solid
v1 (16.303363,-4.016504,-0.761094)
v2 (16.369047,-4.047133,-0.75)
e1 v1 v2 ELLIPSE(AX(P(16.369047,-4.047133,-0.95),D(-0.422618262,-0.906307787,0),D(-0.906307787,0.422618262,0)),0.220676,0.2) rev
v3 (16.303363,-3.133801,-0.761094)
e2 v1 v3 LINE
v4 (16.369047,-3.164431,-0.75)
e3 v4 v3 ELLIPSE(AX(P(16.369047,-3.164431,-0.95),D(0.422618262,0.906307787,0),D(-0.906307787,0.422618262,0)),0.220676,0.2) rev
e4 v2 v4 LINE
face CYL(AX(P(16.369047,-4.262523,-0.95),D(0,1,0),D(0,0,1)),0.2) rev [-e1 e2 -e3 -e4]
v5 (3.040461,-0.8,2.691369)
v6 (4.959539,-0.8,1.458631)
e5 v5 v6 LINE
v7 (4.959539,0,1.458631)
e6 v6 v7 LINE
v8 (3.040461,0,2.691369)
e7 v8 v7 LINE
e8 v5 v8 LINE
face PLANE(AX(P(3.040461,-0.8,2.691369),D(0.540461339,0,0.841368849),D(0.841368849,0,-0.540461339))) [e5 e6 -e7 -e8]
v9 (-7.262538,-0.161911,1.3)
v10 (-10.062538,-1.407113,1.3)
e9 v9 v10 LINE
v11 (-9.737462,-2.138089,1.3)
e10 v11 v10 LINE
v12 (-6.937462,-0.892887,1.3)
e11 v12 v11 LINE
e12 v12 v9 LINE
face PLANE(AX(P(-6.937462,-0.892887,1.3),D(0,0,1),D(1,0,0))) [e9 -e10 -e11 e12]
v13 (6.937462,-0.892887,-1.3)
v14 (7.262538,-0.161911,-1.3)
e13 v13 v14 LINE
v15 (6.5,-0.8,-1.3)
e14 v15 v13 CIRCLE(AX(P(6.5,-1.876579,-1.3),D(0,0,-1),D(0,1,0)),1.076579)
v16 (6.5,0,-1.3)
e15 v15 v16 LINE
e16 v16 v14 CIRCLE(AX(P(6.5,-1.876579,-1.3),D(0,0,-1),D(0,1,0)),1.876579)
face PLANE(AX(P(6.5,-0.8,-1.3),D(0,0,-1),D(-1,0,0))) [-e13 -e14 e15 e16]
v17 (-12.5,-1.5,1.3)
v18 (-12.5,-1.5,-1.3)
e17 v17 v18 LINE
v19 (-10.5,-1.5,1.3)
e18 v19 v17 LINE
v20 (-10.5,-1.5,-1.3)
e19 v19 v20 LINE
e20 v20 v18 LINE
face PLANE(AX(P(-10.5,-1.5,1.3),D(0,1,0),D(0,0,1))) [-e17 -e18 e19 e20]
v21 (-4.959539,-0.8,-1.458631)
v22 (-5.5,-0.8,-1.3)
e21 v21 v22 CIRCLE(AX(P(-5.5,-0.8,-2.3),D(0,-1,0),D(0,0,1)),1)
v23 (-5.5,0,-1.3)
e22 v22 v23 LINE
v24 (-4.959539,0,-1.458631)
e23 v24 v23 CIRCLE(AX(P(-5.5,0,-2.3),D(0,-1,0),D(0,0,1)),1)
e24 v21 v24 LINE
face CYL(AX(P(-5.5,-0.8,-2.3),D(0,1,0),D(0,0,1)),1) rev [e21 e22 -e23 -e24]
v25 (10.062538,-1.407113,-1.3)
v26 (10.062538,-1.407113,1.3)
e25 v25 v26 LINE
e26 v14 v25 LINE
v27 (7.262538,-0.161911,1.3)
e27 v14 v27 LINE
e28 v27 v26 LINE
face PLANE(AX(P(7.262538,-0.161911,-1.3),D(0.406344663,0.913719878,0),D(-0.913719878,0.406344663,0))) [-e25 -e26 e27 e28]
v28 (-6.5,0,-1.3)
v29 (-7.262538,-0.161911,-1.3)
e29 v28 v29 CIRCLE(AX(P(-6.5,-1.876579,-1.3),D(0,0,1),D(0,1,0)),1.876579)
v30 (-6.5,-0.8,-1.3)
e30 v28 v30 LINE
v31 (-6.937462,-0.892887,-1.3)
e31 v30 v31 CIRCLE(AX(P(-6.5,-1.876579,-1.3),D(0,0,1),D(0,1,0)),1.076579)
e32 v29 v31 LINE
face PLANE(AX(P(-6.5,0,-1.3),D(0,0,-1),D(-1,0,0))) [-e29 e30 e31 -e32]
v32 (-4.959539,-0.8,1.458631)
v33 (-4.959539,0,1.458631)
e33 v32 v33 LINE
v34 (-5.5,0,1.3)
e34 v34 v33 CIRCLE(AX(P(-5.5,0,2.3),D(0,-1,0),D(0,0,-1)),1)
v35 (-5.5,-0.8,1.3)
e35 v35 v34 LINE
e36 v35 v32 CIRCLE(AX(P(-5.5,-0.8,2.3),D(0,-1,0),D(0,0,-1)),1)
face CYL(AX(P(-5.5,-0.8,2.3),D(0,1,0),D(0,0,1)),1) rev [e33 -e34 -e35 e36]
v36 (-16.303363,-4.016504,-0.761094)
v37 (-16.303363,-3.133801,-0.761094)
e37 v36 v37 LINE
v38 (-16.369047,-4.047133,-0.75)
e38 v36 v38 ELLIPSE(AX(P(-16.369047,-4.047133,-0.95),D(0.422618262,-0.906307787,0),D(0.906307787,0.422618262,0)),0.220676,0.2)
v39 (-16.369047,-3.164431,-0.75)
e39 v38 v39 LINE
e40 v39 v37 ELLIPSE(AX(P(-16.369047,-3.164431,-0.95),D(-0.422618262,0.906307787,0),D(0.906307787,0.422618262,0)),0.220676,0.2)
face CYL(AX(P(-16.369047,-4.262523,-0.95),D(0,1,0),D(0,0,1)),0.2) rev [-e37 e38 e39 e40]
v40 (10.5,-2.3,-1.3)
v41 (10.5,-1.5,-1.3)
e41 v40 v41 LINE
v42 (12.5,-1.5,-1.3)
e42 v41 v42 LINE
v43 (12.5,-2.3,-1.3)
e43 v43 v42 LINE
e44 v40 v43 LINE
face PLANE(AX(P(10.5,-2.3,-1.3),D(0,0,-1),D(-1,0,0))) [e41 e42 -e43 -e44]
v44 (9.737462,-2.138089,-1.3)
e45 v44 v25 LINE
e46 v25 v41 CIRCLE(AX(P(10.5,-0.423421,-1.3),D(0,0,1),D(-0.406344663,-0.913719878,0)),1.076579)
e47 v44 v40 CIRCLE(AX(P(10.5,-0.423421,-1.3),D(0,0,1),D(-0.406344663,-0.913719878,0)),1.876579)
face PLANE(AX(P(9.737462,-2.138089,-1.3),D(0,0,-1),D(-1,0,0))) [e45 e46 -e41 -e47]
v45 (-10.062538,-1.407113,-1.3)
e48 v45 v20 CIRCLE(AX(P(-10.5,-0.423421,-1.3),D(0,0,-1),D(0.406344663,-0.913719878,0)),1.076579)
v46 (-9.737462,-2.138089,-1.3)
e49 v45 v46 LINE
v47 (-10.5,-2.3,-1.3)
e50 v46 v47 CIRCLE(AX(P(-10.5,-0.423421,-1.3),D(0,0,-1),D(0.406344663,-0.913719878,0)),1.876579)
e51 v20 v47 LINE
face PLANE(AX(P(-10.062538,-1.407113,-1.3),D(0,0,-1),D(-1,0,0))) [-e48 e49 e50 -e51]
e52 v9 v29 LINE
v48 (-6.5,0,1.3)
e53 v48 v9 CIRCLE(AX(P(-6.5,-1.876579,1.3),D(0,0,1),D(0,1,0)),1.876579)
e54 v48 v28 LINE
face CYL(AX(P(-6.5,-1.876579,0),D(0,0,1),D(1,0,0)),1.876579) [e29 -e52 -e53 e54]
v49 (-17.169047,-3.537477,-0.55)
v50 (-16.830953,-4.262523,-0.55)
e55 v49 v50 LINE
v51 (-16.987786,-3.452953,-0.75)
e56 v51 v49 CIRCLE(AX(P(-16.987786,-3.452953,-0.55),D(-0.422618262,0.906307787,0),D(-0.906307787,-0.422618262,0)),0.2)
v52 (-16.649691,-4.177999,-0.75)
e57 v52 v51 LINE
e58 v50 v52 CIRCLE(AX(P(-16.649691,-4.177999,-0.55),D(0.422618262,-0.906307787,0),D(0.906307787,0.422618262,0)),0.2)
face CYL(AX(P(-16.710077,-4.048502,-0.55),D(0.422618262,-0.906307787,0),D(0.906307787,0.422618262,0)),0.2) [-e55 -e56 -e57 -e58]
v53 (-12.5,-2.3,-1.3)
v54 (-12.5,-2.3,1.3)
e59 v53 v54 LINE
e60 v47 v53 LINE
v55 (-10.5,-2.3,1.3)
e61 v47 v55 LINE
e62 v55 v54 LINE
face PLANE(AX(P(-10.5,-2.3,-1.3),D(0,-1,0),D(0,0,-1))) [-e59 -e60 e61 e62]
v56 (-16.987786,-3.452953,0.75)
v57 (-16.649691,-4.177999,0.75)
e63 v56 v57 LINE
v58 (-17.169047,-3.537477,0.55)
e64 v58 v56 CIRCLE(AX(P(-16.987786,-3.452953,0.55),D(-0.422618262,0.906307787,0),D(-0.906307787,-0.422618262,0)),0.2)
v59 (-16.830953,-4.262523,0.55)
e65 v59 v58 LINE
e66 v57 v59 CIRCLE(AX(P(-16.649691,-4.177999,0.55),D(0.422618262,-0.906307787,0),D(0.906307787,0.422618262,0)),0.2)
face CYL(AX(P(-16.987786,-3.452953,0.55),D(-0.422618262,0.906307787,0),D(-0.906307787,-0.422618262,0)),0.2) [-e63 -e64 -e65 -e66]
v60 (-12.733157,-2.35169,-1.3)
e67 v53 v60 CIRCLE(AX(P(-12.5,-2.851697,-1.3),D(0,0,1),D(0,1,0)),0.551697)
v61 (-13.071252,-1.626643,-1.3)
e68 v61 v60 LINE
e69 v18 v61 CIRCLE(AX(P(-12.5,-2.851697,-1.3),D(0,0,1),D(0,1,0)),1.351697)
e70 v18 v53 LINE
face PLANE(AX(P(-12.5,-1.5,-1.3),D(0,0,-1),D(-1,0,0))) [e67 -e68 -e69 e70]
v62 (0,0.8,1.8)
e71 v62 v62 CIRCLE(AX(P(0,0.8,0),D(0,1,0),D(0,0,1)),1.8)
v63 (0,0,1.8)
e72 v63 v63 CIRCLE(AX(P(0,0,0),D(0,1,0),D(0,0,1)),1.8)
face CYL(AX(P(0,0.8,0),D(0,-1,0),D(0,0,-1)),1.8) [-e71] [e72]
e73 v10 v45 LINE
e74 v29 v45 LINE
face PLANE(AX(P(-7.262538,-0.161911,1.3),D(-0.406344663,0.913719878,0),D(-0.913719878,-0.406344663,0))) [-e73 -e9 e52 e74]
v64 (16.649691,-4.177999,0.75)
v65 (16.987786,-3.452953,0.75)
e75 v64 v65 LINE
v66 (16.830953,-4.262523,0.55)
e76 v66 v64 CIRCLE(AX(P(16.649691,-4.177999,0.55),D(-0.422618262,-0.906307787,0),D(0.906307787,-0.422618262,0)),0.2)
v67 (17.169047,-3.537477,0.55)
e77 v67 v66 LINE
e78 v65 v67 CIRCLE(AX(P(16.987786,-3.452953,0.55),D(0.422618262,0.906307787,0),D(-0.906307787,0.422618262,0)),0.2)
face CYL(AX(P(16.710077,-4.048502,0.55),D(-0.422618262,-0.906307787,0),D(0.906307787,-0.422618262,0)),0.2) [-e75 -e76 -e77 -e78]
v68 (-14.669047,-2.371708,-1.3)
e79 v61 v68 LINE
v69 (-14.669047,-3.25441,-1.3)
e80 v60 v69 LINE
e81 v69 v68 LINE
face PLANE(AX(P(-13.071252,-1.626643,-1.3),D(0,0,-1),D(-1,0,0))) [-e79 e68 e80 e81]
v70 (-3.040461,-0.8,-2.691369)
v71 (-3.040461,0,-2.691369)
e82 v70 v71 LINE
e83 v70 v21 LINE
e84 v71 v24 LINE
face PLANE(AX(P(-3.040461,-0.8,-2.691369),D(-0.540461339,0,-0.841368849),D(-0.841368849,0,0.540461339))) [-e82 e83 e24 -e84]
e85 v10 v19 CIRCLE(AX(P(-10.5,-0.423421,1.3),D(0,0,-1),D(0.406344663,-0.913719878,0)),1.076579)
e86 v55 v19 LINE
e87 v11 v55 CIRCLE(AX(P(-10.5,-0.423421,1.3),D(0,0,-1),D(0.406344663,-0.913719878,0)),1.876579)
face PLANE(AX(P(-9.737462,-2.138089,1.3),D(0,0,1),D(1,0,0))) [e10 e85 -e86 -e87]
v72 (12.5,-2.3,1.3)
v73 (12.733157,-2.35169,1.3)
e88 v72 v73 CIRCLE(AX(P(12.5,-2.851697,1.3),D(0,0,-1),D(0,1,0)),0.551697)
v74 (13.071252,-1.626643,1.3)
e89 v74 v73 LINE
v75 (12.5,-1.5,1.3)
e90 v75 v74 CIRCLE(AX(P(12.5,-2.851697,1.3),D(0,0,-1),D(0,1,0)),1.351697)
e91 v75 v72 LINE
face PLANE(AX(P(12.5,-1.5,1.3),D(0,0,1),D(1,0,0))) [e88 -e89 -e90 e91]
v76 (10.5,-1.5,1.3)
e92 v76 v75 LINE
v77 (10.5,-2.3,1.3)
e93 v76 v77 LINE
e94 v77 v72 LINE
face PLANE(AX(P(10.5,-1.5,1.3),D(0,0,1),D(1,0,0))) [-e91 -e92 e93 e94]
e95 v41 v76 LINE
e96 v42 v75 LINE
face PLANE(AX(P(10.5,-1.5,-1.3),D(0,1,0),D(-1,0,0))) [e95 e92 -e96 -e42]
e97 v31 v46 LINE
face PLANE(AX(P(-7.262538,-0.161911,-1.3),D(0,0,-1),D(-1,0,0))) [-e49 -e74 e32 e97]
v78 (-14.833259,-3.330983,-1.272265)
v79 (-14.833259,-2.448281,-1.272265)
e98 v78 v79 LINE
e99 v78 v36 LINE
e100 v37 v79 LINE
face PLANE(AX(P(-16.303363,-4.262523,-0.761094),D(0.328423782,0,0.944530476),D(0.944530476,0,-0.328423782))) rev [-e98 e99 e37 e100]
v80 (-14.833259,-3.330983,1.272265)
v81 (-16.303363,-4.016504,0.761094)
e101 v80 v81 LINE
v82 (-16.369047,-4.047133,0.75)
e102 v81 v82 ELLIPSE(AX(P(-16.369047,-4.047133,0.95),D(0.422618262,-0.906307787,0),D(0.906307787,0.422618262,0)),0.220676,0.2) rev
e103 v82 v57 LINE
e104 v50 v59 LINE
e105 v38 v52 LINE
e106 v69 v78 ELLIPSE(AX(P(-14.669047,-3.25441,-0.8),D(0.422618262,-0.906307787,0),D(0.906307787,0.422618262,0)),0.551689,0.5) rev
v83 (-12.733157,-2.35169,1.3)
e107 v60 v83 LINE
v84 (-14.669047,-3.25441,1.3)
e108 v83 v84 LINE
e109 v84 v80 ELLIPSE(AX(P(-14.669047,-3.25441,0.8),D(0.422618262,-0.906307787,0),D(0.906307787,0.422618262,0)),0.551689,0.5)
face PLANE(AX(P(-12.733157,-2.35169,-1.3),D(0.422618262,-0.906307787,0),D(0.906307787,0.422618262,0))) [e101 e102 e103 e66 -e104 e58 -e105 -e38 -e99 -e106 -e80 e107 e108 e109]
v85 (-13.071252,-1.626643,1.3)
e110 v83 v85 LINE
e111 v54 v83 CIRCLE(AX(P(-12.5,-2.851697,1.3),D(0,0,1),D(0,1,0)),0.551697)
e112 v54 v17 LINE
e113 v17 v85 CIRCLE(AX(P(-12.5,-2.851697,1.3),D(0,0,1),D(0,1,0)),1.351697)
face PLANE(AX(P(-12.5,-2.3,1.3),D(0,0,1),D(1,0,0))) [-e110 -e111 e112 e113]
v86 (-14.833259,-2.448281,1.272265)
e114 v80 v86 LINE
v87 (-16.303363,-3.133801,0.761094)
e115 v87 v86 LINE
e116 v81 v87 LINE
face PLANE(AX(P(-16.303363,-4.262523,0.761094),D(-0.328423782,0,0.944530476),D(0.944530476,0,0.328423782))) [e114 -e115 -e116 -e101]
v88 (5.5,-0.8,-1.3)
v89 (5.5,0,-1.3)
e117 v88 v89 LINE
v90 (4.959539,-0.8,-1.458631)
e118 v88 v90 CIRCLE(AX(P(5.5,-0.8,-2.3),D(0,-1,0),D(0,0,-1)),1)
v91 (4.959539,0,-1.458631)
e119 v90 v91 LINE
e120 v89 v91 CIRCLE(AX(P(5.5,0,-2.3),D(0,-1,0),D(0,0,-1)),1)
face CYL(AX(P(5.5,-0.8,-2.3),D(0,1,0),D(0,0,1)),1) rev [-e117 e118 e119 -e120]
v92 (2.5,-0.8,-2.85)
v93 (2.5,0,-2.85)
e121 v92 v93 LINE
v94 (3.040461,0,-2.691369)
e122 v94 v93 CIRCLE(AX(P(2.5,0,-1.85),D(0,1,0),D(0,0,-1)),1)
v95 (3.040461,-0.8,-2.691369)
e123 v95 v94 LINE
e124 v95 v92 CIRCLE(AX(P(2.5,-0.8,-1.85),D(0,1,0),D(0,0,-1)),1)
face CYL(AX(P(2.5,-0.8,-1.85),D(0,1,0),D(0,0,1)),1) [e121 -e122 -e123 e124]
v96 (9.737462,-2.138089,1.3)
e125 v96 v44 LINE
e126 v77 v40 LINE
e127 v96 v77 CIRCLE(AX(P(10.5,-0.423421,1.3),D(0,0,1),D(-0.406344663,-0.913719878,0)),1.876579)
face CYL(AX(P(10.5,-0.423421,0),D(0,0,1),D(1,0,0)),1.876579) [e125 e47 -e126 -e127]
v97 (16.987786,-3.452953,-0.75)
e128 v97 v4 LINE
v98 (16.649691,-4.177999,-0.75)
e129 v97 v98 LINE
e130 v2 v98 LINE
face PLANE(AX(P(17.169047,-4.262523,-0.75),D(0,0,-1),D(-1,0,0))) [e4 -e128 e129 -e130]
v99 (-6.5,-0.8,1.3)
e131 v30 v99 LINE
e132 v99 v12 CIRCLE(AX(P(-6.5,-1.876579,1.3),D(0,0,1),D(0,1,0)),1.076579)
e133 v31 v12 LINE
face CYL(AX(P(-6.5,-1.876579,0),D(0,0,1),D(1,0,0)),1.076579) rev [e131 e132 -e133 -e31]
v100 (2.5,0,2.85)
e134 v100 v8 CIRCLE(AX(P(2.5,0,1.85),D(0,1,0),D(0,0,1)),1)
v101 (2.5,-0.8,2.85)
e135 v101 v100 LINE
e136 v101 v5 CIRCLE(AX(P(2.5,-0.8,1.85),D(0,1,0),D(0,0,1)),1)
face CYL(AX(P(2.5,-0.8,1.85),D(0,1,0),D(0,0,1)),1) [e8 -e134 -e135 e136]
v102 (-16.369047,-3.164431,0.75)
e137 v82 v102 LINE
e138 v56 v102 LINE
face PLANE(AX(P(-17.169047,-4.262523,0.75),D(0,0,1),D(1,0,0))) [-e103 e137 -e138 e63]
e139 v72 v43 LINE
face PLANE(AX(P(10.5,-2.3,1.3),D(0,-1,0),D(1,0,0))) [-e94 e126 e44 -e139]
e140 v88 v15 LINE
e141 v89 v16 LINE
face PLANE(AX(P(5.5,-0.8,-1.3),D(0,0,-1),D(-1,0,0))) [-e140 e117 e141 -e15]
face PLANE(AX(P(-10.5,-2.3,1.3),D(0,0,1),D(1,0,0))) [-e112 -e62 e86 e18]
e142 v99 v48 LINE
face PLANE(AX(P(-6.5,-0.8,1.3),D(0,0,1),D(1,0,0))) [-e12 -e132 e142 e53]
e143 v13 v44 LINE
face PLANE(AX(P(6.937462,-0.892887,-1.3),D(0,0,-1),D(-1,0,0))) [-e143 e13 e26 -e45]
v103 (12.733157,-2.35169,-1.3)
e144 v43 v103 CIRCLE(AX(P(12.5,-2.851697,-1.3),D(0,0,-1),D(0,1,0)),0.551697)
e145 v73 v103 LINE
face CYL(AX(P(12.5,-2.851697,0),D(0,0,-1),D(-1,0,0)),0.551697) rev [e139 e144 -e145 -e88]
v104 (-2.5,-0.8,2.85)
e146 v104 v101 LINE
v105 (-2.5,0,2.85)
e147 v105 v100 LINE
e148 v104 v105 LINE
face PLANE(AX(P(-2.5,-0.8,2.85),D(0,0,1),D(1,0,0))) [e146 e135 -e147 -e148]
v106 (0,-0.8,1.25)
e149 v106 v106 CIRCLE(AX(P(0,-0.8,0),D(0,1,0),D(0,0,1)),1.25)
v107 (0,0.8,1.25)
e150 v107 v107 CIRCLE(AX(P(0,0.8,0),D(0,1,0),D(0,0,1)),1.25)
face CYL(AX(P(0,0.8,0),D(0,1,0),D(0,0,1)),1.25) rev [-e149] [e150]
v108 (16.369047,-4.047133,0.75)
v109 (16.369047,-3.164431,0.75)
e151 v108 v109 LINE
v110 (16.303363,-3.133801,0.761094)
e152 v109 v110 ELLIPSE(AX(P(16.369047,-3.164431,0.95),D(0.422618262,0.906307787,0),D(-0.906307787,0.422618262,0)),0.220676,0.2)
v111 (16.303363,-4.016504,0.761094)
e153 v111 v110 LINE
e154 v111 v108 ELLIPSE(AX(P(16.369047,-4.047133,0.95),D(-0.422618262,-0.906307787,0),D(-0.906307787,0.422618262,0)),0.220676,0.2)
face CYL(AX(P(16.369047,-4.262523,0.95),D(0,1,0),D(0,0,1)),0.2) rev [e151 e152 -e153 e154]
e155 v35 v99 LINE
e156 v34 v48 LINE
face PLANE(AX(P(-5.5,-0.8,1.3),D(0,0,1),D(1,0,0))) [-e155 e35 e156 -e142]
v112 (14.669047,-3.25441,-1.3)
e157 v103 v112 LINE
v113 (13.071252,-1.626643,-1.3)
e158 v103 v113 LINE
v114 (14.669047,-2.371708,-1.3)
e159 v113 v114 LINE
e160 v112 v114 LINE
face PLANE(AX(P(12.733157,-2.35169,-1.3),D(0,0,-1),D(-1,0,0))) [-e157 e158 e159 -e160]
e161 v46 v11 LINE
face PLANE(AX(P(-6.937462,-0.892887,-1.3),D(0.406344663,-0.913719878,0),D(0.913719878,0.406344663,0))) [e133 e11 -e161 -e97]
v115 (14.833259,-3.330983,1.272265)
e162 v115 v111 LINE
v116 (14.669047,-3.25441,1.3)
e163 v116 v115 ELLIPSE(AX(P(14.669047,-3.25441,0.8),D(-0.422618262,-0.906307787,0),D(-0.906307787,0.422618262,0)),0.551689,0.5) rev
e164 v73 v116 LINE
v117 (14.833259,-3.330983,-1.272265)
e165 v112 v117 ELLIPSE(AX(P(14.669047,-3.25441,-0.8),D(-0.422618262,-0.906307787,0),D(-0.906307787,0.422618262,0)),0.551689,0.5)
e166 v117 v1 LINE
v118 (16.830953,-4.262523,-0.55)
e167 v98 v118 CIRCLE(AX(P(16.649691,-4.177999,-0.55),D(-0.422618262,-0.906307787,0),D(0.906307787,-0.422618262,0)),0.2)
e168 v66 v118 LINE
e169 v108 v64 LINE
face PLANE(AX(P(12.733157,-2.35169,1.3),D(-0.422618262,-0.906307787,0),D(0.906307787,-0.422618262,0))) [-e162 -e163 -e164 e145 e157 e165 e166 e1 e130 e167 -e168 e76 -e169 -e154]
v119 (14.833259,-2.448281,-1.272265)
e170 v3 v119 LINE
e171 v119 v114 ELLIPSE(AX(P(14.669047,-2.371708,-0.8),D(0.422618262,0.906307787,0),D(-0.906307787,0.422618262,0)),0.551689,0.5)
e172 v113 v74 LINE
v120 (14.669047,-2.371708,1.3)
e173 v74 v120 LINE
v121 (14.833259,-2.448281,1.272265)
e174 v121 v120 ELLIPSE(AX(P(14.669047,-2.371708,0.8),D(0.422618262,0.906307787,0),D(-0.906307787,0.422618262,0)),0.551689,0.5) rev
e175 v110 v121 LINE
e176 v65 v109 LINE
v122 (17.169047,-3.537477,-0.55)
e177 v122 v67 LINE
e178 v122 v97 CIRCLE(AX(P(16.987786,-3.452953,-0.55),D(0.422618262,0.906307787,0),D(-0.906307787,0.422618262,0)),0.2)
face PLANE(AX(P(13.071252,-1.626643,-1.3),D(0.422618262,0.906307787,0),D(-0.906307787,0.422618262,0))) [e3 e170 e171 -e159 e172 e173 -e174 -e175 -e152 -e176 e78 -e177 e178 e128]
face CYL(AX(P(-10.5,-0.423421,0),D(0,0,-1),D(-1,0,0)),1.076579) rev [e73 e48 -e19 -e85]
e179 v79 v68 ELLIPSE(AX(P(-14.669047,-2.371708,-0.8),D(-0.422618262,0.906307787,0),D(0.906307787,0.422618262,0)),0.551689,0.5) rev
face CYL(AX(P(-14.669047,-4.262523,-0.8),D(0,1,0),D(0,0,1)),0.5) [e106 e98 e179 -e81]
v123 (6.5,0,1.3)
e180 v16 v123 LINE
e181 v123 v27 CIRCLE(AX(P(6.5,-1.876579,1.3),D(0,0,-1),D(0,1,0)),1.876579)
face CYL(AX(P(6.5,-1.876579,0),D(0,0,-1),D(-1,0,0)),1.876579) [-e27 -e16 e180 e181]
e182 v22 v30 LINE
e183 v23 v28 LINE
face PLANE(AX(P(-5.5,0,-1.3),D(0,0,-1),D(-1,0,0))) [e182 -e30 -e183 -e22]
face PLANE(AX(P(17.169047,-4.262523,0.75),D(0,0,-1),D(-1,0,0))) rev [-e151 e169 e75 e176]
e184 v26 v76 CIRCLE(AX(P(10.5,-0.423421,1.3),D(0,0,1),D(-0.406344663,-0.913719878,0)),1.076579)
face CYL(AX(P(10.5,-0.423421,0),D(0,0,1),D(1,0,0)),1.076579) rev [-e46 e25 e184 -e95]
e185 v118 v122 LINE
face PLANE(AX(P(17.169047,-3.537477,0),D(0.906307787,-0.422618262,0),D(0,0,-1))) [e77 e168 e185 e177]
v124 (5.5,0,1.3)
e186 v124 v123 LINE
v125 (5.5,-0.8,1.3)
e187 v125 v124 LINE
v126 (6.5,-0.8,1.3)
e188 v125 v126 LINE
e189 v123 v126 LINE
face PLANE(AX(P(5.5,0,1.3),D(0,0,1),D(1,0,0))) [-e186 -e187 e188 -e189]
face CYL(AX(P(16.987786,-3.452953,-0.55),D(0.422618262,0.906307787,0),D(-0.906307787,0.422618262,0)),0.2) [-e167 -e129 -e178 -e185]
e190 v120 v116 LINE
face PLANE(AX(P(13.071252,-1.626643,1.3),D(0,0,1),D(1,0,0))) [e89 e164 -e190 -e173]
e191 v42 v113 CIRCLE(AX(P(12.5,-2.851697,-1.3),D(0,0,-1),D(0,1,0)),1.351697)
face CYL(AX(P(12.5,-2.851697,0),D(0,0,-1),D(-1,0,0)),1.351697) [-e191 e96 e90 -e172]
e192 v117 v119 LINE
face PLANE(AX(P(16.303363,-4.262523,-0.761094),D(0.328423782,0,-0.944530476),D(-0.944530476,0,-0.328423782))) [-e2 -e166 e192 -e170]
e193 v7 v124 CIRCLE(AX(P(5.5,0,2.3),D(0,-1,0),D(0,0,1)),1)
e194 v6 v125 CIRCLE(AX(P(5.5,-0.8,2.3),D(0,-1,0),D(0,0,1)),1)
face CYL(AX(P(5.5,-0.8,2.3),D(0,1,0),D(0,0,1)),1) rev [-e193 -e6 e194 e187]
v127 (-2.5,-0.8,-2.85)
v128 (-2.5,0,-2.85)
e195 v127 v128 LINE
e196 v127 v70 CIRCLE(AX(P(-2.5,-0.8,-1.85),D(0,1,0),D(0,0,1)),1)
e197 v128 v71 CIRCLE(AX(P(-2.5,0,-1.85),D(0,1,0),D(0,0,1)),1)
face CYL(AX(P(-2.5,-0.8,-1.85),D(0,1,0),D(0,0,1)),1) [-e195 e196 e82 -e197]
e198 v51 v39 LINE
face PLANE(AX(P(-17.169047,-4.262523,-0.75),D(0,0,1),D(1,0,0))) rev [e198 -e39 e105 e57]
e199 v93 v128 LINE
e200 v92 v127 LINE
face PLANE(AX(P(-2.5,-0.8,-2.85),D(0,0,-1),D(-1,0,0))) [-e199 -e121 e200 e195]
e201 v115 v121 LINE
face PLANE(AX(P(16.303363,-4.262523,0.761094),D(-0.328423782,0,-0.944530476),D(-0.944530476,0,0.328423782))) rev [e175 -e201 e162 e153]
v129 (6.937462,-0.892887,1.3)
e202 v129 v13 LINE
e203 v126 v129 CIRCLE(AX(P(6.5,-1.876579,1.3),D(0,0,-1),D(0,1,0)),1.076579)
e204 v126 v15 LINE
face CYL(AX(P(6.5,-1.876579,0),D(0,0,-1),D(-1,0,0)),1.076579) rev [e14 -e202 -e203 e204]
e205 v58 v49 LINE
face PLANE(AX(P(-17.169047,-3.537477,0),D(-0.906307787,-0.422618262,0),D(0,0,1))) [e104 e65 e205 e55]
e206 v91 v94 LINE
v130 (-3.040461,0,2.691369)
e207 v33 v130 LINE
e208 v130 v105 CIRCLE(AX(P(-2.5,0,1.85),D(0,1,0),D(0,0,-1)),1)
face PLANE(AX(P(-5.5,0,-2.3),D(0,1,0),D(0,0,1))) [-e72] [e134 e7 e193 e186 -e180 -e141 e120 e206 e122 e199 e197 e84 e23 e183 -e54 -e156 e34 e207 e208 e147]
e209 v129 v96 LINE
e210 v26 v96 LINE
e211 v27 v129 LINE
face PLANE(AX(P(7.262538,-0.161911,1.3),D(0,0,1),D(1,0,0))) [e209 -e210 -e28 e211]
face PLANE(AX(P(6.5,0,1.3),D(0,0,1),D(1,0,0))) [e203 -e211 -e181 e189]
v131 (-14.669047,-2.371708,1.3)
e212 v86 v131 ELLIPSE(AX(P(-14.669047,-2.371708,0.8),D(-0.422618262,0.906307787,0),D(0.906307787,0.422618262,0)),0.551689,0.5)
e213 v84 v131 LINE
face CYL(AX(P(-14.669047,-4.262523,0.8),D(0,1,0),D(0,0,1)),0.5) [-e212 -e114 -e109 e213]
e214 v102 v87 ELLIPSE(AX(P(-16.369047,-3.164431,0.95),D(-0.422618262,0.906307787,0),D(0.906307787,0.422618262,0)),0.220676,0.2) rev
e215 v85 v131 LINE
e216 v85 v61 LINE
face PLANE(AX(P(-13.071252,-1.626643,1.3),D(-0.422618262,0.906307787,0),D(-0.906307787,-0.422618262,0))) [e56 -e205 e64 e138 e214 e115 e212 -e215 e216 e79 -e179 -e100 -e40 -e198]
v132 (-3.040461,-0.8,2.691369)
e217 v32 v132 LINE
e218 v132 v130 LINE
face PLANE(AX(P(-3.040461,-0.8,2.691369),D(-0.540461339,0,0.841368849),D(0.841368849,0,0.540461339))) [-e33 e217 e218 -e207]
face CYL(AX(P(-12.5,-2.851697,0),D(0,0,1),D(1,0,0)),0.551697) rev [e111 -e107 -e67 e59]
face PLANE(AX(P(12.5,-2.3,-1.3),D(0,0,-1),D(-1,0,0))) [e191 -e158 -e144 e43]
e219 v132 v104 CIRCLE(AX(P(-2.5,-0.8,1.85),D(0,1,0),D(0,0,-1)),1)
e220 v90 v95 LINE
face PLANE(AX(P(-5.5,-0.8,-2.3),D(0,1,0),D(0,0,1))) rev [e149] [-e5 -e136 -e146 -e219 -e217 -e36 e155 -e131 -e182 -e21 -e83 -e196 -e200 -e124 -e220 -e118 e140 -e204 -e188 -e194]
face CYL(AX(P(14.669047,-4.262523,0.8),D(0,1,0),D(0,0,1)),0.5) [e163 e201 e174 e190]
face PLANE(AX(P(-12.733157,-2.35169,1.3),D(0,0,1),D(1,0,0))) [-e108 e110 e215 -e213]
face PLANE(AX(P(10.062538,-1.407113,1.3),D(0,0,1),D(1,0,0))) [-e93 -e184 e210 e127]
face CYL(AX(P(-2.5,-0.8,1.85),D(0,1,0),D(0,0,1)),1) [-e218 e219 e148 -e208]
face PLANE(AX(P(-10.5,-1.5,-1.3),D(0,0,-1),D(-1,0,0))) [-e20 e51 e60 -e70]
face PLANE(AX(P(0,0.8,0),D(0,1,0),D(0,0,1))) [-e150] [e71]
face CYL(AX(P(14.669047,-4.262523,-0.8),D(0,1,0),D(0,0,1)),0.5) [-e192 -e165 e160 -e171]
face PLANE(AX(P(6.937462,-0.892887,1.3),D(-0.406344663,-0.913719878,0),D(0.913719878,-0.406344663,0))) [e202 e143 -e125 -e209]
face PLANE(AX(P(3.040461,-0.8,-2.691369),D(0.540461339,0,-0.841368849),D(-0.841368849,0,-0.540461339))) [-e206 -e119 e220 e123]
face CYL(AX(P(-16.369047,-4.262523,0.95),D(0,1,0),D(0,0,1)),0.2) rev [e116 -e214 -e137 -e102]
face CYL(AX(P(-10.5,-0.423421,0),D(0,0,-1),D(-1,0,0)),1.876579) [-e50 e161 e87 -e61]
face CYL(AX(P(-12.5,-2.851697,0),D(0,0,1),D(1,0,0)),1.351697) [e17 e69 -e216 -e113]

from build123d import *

# Parameters (mm, degrees)
BOSS_EXTRUDE1_DEPTH   = 0.8
SWEEP1_START          = -1.3
SWEEP1_DEPTH          = 2.6
SWEEP2_START          = -1.3
SWEEP2_DEPTH          = 2.6
CUT_EXTRUDE1_DEPTH    = 18.918364565
MIRROR3_COPY_1_DEPTH  = 18.918364565
SKETCH5_R             = 1.8
SKETCH5_R_2           = 1.2
BOSS_EXTRUDE2_DEPTH   = 0.8
M3X0_5_TAPPED_HOLE1_D = 2.5
FILLET1_R             = 0.2


# Read off the part's stored shape, not the designer's step: Sweep1, Sweep2
with BuildPart() as part:
    # Sketch1 → Boss-Extrude1 (new body)
    with BuildSketch(Plane(origin=(0, 0, 0), x_dir=(1, 0, 0), z_dir=(0, 1, 0))):
        with BuildLine():
            Line((-2.5, 2.85), (2.5, 2.85))
            ThreePointArc((2.5, 2.85), (2.78163021, 2.809523019), (3.040461339, 2.691368849))
            Line((3.040461339, 2.691368849), (4.959538661, 1.458631151))
            ThreePointArc((4.959538661, 1.458631151), (5.21836979, 1.340476981), (5.5, 1.3))
            Line((5.5, 1.3), (5.5, -1.3))
            ThreePointArc((5.5, -1.3), (5.21836979, -1.340476981), (4.959538661, -1.458631151))
            Line((4.959538661, -1.458631151), (3.040461339, -2.691368849))
            ThreePointArc((3.040461339, -2.691368849), (2.78163021, -2.809523019), (2.5, -2.85))
            Line((2.5, -2.85), (-2.5, -2.85))
            ThreePointArc((-2.5, -2.85), (-2.78163021, -2.809523019), (-3.040461339, -2.691368849))
            Line((-3.040461339, -2.691368849), (-4.959538661, -1.458631151))
            ThreePointArc((-4.959538661, -1.458631151), (-5.21836979, -1.340476981), (-5.5, -1.3))
            Line((-5.5, -1.3), (-5.5, 1.3))
            ThreePointArc((-5.5, 1.3), (-5.21836979, 1.340476981), (-4.959538661, 1.458631151))
            Line((-4.959538661, 1.458631151), (-3.040461339, 2.691368849))
            ThreePointArc((-3.040461339, 2.691368849), (-2.78163021, 2.809523019), (-2.5, 2.85))
        make_face()
    extrude(amount=-BOSS_EXTRUDE1_DEPTH)

    # Sweep1 outline → Sweep1 (add)
    with BuildSketch(Plane.XY.offset(SWEEP1_START)):
        with BuildLine():
            Line((-13.071251863, -1.626643489), (-17.169047305, -3.537476885))
            Line((-17.169047305, -3.537476885), (-16.830952695, -4.262523115))
            Line((-16.830952695, -4.262523115), (-12.733157253, -2.351689719))
            ThreePointArc((-12.733157253, -2.351689719), (-12.619409099, -2.313077423), (-12.5, -2.3))
            Line((-12.5, -2.3), (-10.5, -2.3))
            ThreePointArc((-10.5, -2.3), (-10.110231056, -2.259075901), (-9.737462135, -2.138088534))
            Line((-9.737462135, -2.138088534), (-6.937462135, -0.892887369))
            ThreePointArc((-6.937462135, -0.892887369), (-6.723607459, -0.823477842), (-6.5, -0.8))
            Line((-6.5, -0.8), (-5.5, -0.8))
            Line((-5.5, -0.8), (-5.5, 0))
            Line((-5.5, 0), (-6.5, 0))
            ThreePointArc((-6.5, 0), (-6.889768944, -0.040924099), (-7.262537865, -0.161911466))
            Line((-7.262537865, -0.161911466), (-10.062537865, -1.407112631))
            ThreePointArc((-10.062537865, -1.407112631), (-10.276392541, -1.476522158), (-10.5, -1.5))
            Line((-10.5, -1.5), (-12.5, -1.5))
            ThreePointArc((-12.5, -1.5), (-12.79256079, -1.532040618), (-13.071251863, -1.626643489))
        make_face()
    extrude(amount=SWEEP1_DEPTH)

    # Sweep2 outline → Sweep2 (add)
    with BuildSketch(Plane.XY.offset(SWEEP2_START)):
        with BuildLine():
            ThreePointArc((13.071251863, -1.626643489), (12.79256079, -1.532040618), (12.5, -1.5))
            Line((12.5, -1.5), (10.5, -1.5))
            ThreePointArc((10.5, -1.5), (10.276392541, -1.476522158), (10.062537865, -1.407112631))
            Line((10.062537865, -1.407112631), (7.262537865, -0.161911466))
            ThreePointArc((7.262537865, -0.161911466), (6.889768944, -0.040924099), (6.5, 0))
            Line((6.5, 0), (5.5, 0))
            Line((5.5, 0), (5.5, -0.8))
            Line((5.5, -0.8), (6.5, -0.8))
            ThreePointArc((6.5, -0.8), (6.723607459, -0.823477842), (6.937462135, -0.892887369))
            Line((6.937462135, -0.892887369), (9.737462135, -2.138088534))
            ThreePointArc((9.737462135, -2.138088534), (10.110231056, -2.259075901), (10.5, -2.3))
            Line((10.5, -2.3), (12.5, -2.3))
            ThreePointArc((12.5, -2.3), (12.619409099, -2.313077423), (12.733157253, -2.351689719))
            Line((12.733157253, -2.351689719), (16.830952695, -4.262523115))
            Line((16.830952695, -4.262523115), (17.169047305, -3.537476885))
            Line((17.169047305, -3.537476885), (13.071251863, -1.626643489))
        make_face()
    extrude(amount=SWEEP2_DEPTH)

    # Sketch3 → Cut-Extrude1 (cut, through all)
    with BuildSketch(Plane(origin=(0, 0, 0), x_dir=(1, 0, 0), z_dir=(0, 1, 0))):
        with BuildLine():
            Line((-17.169047305, 0.75), (-16.369047305, 0.75))
            ThreePointArc((-16.369047305, 0.75), (-16.335739791, 0.752792978), (-16.303362548, 0.761093905))
            Line((-16.303362548, 0.761093905), (-14.833259195, 1.272265238))
            ThreePointArc((-14.833259195, 1.272265238), (-14.75231609, 1.293017555), (-14.669047305, 1.3))
            Line((-14.669047305, 1.3), (-17.169047305, 1.3))
            Line((-17.169047305, 1.3), (-17.169047305, 0.75))
        make_face()
    cut_extrude1 = extrude(amount=-CUT_EXTRUDE1_DEPTH, mode=Mode.SUBTRACT)

    # Mirror1: Cut-Extrude1 across plane
    add(cut_extrude1.mirror(Plane.XY), mode=Mode.SUBTRACT)

    # Mirror3: Cut-Extrude1 across plane
    add(cut_extrude1.mirror(Plane(origin=(0, 0, 0), x_dir=(0, 0, 1), z_dir=(1, 0, 0))), mode=Mode.SUBTRACT)

    # Mirror3 copy 1 sketch → Mirror3 copy 1 (cut, through all)
    with BuildSketch(Plane(origin=(0, 0, 0), x_dir=(-1, 0, 0), z_dir=(0, 1, 0))):
        with BuildLine():
            Line((-17.169047305, 0.75), (-16.369047305, 0.75))
            ThreePointArc((-16.369047305, 0.75), (-16.335739791, 0.752792978), (-16.303362548, 0.761093905))
            Line((-16.303362548, 0.761093905), (-14.833259195, 1.272265238))
            ThreePointArc((-14.833259195, 1.272265238), (-14.75231609, 1.293017555), (-14.669047305, 1.3))
            Line((-14.669047305, 1.3), (-17.169047305, 1.3))
            Line((-17.169047305, 1.3), (-17.169047305, 0.75))
        make_face()
    extrude(amount=-MIRROR3_COPY_1_DEPTH, mode=Mode.SUBTRACT)

    # Sketch5 → Boss-Extrude2 (add)
    with BuildSketch(Plane(origin=(0, 0, 0), x_dir=(1, 0, 0), z_dir=(0, 1, 0))):
        with Locations(Location((0, 0, 0), (0, 0, 270))):
            Circle(SKETCH5_R)
        with Locations(Location((0, 0, 0), (0, 0, 270))):
            Circle(SKETCH5_R_2, mode=Mode.SUBTRACT)
    extrude(amount=BOSS_EXTRUDE2_DEPTH)

    # M3x0.5 Tapped Hole1 (through all)
    with Locations(Plane(origin=(0, 0.8, 0), x_dir=(1, 0, 0), z_dir=(0, 1, 0))):
        with Locations((0, 0)):
            Hole(M3X0_5_TAPPED_HOLE1_D / 2)

    # Fillet1
    fillet1_edges = [part.edges().sort_by_distance(p)[0] for p in [
        (-17, -3.9, -0.75),
        (-17, -3.9, 0.75),
        (17, -3.9, -0.75),
        (17, -3.9, 0.75),
    ]]
    fillet(fillet1_edges, radius=FILLET1_R)


solid = part.part
